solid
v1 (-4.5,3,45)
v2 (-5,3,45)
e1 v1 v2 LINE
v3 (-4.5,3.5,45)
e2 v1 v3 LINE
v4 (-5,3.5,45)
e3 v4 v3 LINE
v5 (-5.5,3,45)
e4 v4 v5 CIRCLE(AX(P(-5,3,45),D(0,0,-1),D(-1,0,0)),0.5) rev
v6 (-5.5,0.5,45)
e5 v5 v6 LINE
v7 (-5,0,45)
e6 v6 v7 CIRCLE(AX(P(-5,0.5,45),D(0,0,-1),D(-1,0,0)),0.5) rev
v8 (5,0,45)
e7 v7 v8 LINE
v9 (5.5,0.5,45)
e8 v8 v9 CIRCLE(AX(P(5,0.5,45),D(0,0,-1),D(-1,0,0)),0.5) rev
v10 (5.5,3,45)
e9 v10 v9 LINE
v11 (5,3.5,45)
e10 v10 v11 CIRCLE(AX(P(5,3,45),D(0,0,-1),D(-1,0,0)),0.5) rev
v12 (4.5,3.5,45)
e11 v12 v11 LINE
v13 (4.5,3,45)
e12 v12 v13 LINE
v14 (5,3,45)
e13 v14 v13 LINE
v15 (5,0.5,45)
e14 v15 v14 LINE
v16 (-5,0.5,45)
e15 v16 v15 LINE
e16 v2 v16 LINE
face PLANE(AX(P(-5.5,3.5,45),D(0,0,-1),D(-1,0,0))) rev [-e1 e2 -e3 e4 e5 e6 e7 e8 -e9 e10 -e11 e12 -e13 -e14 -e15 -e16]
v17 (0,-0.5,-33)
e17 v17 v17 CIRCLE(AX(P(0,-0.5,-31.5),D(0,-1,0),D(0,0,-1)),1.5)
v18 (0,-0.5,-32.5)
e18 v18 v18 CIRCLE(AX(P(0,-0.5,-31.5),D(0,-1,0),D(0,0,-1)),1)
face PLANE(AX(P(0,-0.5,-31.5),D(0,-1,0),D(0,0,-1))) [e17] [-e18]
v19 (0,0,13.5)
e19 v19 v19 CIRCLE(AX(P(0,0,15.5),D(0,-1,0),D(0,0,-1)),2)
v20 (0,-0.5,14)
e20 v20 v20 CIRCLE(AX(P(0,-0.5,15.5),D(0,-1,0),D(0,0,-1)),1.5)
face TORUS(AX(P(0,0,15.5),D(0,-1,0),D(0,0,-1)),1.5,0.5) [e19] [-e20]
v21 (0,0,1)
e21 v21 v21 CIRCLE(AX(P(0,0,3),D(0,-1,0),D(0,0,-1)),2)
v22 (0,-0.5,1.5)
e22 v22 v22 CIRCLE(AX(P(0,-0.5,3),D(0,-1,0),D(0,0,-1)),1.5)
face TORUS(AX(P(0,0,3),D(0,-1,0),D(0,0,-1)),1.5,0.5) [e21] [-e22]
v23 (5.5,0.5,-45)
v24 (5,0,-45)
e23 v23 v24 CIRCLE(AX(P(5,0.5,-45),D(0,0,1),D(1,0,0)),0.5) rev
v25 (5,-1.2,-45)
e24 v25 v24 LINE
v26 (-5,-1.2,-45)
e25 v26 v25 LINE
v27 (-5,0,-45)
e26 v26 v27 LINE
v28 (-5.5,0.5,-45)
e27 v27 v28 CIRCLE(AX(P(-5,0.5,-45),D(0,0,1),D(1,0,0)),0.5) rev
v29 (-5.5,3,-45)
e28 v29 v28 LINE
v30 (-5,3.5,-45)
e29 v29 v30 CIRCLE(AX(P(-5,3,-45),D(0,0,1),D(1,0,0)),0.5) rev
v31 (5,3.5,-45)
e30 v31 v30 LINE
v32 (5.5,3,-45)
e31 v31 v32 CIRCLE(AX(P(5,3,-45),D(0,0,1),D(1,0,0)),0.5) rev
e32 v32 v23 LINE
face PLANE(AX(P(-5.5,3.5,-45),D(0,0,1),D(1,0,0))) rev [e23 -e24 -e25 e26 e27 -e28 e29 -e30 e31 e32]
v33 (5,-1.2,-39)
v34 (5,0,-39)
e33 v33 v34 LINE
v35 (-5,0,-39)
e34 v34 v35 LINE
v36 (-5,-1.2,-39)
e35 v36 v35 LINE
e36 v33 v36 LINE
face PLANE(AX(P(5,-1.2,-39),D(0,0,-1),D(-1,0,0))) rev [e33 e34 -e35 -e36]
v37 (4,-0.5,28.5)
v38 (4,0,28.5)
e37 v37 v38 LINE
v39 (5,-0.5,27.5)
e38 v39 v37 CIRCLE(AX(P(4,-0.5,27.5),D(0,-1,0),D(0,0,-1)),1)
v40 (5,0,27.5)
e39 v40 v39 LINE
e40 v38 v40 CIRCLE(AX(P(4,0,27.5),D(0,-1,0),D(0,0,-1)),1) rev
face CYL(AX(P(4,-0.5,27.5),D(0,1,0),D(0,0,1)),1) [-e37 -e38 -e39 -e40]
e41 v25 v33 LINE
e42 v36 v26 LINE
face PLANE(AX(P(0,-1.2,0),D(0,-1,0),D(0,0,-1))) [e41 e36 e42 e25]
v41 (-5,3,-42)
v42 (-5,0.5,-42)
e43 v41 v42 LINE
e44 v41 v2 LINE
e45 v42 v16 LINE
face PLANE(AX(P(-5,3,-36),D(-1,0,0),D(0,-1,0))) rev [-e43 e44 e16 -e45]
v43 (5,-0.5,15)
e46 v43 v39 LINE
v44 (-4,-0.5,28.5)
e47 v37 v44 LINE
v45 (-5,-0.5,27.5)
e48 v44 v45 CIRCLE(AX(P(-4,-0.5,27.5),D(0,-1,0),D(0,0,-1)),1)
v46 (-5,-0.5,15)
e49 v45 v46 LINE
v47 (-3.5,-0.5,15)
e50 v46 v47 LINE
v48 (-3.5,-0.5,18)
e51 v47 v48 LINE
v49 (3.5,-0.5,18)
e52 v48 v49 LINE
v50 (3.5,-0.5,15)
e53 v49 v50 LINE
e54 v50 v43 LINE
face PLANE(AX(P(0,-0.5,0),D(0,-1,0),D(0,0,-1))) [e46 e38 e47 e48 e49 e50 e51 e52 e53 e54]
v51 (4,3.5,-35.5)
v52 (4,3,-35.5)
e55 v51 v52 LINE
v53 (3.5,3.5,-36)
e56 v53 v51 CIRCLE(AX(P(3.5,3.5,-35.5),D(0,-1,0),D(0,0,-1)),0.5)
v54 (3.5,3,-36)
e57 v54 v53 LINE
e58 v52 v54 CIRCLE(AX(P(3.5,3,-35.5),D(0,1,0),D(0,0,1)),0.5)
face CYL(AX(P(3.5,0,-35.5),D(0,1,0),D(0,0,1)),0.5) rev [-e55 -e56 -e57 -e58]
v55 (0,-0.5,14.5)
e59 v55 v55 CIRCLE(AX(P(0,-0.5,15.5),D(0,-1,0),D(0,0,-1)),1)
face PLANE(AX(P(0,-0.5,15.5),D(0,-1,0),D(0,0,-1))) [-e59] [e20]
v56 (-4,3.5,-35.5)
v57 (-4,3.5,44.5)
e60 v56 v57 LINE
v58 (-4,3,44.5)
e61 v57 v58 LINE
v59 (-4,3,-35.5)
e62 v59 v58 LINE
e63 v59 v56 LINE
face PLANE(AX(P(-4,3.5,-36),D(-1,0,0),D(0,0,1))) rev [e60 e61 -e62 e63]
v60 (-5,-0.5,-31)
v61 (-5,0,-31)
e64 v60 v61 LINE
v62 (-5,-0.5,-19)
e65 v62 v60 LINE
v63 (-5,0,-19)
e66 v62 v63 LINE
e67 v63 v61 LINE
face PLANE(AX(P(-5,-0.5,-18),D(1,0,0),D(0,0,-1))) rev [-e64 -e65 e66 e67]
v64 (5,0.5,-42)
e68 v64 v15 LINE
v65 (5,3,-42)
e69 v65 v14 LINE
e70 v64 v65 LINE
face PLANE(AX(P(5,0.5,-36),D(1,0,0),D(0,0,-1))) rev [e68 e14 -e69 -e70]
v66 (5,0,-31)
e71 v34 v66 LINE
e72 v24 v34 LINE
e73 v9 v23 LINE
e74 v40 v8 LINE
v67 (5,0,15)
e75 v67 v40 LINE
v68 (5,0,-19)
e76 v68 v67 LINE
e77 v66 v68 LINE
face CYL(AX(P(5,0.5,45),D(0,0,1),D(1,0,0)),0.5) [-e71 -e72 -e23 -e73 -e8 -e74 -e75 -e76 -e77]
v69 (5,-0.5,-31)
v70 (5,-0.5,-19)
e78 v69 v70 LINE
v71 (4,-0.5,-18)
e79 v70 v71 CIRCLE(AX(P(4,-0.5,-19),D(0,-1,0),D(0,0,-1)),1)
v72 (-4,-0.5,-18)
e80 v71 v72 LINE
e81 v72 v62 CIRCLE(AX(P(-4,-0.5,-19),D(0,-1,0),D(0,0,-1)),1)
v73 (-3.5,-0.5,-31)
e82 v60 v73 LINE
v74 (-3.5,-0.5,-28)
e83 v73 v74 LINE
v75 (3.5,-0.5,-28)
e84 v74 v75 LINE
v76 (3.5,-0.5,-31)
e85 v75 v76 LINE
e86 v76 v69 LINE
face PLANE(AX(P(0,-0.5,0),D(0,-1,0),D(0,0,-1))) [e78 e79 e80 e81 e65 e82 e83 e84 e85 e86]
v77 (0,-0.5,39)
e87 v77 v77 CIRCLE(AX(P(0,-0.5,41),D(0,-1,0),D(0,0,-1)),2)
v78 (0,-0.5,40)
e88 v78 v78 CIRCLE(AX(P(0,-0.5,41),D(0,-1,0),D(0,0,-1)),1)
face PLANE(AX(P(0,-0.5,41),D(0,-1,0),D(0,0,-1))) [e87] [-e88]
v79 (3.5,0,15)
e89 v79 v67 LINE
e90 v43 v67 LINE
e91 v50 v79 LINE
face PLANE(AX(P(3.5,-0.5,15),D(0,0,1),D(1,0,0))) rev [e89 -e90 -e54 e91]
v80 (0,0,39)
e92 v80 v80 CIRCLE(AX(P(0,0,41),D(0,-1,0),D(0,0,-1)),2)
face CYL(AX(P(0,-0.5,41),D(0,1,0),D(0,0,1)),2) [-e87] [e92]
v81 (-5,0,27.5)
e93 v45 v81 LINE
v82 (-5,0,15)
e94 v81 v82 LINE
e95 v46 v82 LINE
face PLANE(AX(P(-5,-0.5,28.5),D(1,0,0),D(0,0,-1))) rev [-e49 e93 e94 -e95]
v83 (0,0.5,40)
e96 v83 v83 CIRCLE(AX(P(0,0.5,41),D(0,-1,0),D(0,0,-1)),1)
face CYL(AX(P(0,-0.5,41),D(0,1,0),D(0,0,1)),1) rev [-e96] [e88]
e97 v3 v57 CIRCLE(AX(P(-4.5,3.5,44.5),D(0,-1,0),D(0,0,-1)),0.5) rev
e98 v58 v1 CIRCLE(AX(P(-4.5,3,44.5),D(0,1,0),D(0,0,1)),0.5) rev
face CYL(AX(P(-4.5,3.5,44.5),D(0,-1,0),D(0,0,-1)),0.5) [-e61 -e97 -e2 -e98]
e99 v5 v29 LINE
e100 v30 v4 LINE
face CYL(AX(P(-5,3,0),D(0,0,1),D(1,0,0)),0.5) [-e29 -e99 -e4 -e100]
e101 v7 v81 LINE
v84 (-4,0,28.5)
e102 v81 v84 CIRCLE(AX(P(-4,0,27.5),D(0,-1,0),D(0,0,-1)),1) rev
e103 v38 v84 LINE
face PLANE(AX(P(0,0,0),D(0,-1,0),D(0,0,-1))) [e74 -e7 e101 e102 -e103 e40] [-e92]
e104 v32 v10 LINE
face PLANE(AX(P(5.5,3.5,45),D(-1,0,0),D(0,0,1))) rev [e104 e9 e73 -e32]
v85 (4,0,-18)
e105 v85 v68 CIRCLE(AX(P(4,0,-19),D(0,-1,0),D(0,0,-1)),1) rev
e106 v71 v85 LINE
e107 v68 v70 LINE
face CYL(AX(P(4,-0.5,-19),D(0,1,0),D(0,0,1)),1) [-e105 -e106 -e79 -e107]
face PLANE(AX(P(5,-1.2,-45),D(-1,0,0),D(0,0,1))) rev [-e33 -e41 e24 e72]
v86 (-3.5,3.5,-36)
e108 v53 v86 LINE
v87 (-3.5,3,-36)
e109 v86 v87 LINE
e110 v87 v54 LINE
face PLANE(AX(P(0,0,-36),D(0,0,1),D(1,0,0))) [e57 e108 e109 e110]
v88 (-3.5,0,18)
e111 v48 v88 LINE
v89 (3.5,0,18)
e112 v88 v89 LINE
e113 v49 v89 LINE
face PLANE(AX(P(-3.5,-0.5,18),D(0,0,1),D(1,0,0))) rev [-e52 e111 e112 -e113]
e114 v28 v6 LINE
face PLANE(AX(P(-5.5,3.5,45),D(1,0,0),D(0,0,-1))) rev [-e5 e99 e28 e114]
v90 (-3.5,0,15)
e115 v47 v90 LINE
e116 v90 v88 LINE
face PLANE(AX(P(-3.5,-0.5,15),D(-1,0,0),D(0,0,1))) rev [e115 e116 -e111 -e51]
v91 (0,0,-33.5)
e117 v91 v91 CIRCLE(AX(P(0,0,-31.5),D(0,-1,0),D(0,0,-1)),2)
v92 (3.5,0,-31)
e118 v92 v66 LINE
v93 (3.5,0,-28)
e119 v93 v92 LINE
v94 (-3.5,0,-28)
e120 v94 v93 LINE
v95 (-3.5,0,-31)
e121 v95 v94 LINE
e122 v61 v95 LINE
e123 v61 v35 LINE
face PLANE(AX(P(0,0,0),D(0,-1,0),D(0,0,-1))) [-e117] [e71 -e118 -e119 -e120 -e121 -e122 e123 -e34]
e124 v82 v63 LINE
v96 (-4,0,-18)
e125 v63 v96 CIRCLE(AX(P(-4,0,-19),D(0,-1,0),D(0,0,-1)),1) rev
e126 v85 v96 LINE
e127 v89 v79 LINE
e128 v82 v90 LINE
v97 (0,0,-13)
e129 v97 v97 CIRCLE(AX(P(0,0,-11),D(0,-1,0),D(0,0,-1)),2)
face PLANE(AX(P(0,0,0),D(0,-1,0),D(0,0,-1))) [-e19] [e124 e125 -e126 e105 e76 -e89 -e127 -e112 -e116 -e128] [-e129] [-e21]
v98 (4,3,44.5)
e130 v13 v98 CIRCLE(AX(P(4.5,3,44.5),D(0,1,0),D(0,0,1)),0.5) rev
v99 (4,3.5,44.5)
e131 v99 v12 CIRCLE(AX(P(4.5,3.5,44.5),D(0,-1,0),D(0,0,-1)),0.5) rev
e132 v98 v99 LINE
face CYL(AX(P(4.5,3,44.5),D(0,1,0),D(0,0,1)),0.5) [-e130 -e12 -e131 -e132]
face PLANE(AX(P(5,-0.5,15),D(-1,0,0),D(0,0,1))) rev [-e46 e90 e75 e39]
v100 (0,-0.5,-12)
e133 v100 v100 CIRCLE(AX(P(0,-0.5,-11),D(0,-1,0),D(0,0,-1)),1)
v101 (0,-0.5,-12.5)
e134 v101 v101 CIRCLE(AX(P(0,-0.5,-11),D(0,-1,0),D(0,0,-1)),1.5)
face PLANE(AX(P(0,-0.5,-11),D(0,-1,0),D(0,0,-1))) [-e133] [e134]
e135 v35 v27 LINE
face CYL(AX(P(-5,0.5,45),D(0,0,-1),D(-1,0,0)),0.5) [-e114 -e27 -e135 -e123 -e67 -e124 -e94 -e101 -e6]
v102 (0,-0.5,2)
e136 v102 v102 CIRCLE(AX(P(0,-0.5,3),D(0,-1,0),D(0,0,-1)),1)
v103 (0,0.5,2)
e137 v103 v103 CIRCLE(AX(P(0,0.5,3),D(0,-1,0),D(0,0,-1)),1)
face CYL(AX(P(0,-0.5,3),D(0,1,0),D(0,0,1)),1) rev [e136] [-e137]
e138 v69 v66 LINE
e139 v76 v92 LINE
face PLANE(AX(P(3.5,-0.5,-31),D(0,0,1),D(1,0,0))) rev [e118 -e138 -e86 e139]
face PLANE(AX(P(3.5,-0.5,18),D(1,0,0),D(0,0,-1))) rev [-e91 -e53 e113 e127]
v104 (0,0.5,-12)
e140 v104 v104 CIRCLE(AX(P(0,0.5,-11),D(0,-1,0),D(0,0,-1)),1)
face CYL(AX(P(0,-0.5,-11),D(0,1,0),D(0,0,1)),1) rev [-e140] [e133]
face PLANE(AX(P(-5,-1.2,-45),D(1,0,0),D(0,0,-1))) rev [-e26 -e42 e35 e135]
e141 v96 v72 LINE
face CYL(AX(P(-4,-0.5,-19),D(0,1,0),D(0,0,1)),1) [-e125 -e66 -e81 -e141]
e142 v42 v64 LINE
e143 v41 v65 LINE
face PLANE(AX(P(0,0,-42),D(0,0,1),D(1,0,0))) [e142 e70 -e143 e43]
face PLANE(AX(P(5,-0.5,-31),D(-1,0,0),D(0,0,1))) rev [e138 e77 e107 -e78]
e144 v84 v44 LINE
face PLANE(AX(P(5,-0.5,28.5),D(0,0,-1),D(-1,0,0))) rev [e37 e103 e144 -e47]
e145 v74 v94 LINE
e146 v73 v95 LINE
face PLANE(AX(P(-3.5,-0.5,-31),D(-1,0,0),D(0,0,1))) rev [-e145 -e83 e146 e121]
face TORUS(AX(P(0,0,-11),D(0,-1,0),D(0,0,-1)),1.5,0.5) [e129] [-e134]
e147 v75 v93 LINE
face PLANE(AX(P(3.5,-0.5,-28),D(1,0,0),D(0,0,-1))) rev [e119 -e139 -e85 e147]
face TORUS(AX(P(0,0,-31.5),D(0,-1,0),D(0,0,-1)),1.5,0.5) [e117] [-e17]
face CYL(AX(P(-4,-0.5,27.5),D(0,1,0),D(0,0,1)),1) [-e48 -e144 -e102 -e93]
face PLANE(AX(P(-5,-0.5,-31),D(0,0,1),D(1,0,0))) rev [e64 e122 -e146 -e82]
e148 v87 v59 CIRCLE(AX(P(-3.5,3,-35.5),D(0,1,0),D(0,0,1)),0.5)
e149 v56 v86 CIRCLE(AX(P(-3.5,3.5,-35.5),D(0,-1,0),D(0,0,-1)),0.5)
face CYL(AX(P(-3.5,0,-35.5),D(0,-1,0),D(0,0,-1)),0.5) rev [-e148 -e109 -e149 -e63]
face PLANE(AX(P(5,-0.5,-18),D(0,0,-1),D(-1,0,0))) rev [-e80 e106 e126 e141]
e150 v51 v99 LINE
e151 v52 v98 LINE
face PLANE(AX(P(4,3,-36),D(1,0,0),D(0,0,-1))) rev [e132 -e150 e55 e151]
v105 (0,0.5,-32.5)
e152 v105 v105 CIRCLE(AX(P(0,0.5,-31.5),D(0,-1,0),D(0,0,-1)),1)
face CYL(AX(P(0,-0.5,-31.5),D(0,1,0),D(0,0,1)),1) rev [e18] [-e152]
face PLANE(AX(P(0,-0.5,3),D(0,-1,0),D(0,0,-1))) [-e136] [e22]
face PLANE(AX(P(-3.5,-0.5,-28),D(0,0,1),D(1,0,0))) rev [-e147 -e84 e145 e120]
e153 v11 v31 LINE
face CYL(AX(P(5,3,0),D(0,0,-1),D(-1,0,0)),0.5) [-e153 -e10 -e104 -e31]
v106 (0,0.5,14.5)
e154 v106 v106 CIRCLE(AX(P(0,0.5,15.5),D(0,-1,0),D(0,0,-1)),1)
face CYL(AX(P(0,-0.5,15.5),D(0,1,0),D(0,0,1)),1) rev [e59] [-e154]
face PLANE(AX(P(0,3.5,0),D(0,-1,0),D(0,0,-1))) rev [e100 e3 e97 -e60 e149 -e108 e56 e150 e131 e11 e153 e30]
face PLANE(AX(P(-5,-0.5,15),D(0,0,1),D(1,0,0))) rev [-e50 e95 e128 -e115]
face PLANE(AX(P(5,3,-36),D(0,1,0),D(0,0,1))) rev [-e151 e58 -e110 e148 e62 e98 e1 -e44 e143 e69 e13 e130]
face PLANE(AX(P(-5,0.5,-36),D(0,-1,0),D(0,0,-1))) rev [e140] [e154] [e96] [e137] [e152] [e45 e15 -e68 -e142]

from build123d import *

# Parameters (mm, degrees)
SKETCH1_W           = 11
SKETCH1_H           = 90
BOSS_EXTRUDE1_DEPTH = 3.5
CUT_EXTRUDE1_DEPTH  = 81
CUT_EXTRUDE2_DEPTH  = 6
FILLET1_R           = 0.5
FILLET2_R           = 0.5
SKETCH4_R           = 2
SKETCH4_R_2         = 1
BOSS_EXTRUDE2_DEPTH = 0.5
CUT_EXTRUDE3_START  = -1
SKETCH4_2_R         = 1
CUT_EXTRUDE3_DEPTH  = 1
FILLET3_R           = 0.5
FILLET4_R           = 1
SKETCH5_W           = 10
SKETCH5_H           = 6
BOSS_EXTRUDE3_DEPTH = 1.2


with BuildPart() as part:
    # Sketch1 → Boss-Extrude1 (new body)
    with BuildSketch(Plane(origin=(0, 0, 0), x_dir=(1, 0, 0), z_dir=(0, 1, 0))):
        Rectangle(SKETCH1_W, SKETCH1_H)
    extrude(amount=BOSS_EXTRUDE1_DEPTH)

    # Sketch2 → Cut-Extrude1 (cut)
    with BuildSketch(Plane.XY.offset(45)):
        Polygon((-4, 3.5), (-4, 3), (-5, 3), (-5, 0.5), (5, 0.5), (5, 3), (4, 3), (4, 3.5), align=None)
    extrude(amount=-CUT_EXTRUDE1_DEPTH, mode=Mode.SUBTRACT)

    # Sketch3 → Cut-Extrude2 (cut)
    with BuildSketch(Plane.XY.offset(-36)):
        Polygon((-4, 3), (4, 3), (5, 3), (5, 0.5), (-5, 0.5), (-5, 3), align=None)
    extrude(amount=-CUT_EXTRUDE2_DEPTH, mode=Mode.SUBTRACT)

    # Fillet1
    fillet1_edges = [part.edges().sort_by_distance(p)[0] for p in [
        (-5.5, 3.5, 0),
        (5.5, 3.5, 0),
        (-5.5, 0, 0),
        (5.5, 0, 0),
    ]]
    fillet(fillet1_edges, radius=FILLET1_R)

    # Fillet2
    fillet2_edges = [part.edges().sort_by_distance(p)[0] for p in [
        (4, 3.25, -36),
        (-4, 3.25, -36),
        (-4, 3.25, 45),
        (4, 3.25, 45),
    ]]
    fillet(fillet2_edges, radius=FILLET2_R)

    # Sketch4 → Boss-Extrude2 (add)
    # profile 1 of 7: a face of its own
    with BuildSketch(Plane.XZ):
        with Locations(Location((0, -31.5, 0), (0, 0, 270))):
            Circle(SKETCH4_R)
        with Locations(Location((0, -31.5, 0), (0, 0, 270))):
            Circle(SKETCH4_R_2, mode=Mode.SUBTRACT)
    # profile 2 of 7: a face of its own
    with BuildSketch(Plane.XZ):
        with Locations(Location((0, -11, 0), (0, 0, 270))):
            Circle(SKETCH4_R)
        with Locations(Location((0, -11, 0), (0, 0, 270))):
            Circle(SKETCH4_R_2, mode=Mode.SUBTRACT)
    # profile 3 of 7: a face of its own
    with BuildSketch(Plane.XZ):
        with Locations(Location((0, 3, 0), (0, 0, 270))):
            Circle(SKETCH4_R)
        with Locations(Location((0, 3, 0), (0, 0, 270))):
            Circle(SKETCH4_R_2, mode=Mode.SUBTRACT)
    # profile 4 of 7: a face of its own
    with BuildSketch(Plane.XZ):
        with Locations(Location((0, 41, 0), (0, 0, 270))):
            Circle(SKETCH4_R)
        with Locations(Location((0, 41, 0), (0, 0, 270))):
            Circle(SKETCH4_R_2, mode=Mode.SUBTRACT)
    # profile 5 of 7: a face of its own
    with BuildSketch(Plane.XZ):
        with Locations(Location((0, 15.5, 0), (0, 0, 270))):
            Circle(SKETCH4_R)
        with Locations(Location((0, 15.5, 0), (0, 0, 270))):
            Circle(SKETCH4_R_2, mode=Mode.SUBTRACT)
    # profile 6 of 7: a face of its own
    with BuildSketch(Plane.XZ):
        Polygon((5, 28.5), (-5, 28.5), (-5, 15), (-3.5, 15), (-3.5, 18), (3.5, 18), (3.5, 15), (5, 15), align=None)
    # profile 7 of 7: a face of its own
    with BuildSketch(Plane.XZ):
        Polygon((5, -18), (-5, -18), (-5, -31), (-3.5, -31), (-3.5, -28), (3.5, -28), (3.5, -31), (5, -31), align=None)
    extrude(amount=BOSS_EXTRUDE2_DEPTH)

    # Sketch4<2> → Cut-Extrude3 (cut)
    with BuildSketch(Plane.XZ.offset(CUT_EXTRUDE3_START)):
        with Locations(Location((0, -31.5, 0), (0, 0, 270))):
            Circle(SKETCH4_2_R)
        with Locations(Location((0, -11, 0), (0, 0, 270))):
            Circle(SKETCH4_2_R)
        with Locations(Location((0, 3, 0), (0, 0, 270))):
            Circle(SKETCH4_2_R)
        with Locations(Location((0, 15.5, 0), (0, 0, 270))):
            Circle(SKETCH4_2_R)
        with Locations(Location((0, 41, 0), (0, 0, 270))):
            Circle(SKETCH4_2_R)
    extrude(amount=CUT_EXTRUDE3_DEPTH, mode=Mode.SUBTRACT)

    # Fillet3
    fillet3_edges = [part.edges().sort_by_distance(p)[0] for p in [
        (0, -0.5, -29.5),
        (0, -0.5, -9),
        (0, -0.5, 5),
        (0, -0.5, 17.5),
    ]]
    fillet(fillet3_edges, radius=FILLET3_R - 0.0001)  # a hair under: the kernel refuses the full size

    # Fillet4
    fillet4_edges = [part.edges().sort_by_distance(p)[0] for p in [
        (5, -0.25, 28.5),
        (-5, -0.25, 28.5),
        (5, -0.25, -18),
        (-5, -0.25, -18),
    ]]
    fillet(fillet4_edges, radius=FILLET4_R)

    # Sketch5 → Boss-Extrude3 (add)
    with BuildSketch(Plane.XZ):
        with Locations((0, -42)):
            Rectangle(SKETCH5_W, SKETCH5_H)
    extrude(amount=BOSS_EXTRUDE3_DEPTH)


solid = part.part
